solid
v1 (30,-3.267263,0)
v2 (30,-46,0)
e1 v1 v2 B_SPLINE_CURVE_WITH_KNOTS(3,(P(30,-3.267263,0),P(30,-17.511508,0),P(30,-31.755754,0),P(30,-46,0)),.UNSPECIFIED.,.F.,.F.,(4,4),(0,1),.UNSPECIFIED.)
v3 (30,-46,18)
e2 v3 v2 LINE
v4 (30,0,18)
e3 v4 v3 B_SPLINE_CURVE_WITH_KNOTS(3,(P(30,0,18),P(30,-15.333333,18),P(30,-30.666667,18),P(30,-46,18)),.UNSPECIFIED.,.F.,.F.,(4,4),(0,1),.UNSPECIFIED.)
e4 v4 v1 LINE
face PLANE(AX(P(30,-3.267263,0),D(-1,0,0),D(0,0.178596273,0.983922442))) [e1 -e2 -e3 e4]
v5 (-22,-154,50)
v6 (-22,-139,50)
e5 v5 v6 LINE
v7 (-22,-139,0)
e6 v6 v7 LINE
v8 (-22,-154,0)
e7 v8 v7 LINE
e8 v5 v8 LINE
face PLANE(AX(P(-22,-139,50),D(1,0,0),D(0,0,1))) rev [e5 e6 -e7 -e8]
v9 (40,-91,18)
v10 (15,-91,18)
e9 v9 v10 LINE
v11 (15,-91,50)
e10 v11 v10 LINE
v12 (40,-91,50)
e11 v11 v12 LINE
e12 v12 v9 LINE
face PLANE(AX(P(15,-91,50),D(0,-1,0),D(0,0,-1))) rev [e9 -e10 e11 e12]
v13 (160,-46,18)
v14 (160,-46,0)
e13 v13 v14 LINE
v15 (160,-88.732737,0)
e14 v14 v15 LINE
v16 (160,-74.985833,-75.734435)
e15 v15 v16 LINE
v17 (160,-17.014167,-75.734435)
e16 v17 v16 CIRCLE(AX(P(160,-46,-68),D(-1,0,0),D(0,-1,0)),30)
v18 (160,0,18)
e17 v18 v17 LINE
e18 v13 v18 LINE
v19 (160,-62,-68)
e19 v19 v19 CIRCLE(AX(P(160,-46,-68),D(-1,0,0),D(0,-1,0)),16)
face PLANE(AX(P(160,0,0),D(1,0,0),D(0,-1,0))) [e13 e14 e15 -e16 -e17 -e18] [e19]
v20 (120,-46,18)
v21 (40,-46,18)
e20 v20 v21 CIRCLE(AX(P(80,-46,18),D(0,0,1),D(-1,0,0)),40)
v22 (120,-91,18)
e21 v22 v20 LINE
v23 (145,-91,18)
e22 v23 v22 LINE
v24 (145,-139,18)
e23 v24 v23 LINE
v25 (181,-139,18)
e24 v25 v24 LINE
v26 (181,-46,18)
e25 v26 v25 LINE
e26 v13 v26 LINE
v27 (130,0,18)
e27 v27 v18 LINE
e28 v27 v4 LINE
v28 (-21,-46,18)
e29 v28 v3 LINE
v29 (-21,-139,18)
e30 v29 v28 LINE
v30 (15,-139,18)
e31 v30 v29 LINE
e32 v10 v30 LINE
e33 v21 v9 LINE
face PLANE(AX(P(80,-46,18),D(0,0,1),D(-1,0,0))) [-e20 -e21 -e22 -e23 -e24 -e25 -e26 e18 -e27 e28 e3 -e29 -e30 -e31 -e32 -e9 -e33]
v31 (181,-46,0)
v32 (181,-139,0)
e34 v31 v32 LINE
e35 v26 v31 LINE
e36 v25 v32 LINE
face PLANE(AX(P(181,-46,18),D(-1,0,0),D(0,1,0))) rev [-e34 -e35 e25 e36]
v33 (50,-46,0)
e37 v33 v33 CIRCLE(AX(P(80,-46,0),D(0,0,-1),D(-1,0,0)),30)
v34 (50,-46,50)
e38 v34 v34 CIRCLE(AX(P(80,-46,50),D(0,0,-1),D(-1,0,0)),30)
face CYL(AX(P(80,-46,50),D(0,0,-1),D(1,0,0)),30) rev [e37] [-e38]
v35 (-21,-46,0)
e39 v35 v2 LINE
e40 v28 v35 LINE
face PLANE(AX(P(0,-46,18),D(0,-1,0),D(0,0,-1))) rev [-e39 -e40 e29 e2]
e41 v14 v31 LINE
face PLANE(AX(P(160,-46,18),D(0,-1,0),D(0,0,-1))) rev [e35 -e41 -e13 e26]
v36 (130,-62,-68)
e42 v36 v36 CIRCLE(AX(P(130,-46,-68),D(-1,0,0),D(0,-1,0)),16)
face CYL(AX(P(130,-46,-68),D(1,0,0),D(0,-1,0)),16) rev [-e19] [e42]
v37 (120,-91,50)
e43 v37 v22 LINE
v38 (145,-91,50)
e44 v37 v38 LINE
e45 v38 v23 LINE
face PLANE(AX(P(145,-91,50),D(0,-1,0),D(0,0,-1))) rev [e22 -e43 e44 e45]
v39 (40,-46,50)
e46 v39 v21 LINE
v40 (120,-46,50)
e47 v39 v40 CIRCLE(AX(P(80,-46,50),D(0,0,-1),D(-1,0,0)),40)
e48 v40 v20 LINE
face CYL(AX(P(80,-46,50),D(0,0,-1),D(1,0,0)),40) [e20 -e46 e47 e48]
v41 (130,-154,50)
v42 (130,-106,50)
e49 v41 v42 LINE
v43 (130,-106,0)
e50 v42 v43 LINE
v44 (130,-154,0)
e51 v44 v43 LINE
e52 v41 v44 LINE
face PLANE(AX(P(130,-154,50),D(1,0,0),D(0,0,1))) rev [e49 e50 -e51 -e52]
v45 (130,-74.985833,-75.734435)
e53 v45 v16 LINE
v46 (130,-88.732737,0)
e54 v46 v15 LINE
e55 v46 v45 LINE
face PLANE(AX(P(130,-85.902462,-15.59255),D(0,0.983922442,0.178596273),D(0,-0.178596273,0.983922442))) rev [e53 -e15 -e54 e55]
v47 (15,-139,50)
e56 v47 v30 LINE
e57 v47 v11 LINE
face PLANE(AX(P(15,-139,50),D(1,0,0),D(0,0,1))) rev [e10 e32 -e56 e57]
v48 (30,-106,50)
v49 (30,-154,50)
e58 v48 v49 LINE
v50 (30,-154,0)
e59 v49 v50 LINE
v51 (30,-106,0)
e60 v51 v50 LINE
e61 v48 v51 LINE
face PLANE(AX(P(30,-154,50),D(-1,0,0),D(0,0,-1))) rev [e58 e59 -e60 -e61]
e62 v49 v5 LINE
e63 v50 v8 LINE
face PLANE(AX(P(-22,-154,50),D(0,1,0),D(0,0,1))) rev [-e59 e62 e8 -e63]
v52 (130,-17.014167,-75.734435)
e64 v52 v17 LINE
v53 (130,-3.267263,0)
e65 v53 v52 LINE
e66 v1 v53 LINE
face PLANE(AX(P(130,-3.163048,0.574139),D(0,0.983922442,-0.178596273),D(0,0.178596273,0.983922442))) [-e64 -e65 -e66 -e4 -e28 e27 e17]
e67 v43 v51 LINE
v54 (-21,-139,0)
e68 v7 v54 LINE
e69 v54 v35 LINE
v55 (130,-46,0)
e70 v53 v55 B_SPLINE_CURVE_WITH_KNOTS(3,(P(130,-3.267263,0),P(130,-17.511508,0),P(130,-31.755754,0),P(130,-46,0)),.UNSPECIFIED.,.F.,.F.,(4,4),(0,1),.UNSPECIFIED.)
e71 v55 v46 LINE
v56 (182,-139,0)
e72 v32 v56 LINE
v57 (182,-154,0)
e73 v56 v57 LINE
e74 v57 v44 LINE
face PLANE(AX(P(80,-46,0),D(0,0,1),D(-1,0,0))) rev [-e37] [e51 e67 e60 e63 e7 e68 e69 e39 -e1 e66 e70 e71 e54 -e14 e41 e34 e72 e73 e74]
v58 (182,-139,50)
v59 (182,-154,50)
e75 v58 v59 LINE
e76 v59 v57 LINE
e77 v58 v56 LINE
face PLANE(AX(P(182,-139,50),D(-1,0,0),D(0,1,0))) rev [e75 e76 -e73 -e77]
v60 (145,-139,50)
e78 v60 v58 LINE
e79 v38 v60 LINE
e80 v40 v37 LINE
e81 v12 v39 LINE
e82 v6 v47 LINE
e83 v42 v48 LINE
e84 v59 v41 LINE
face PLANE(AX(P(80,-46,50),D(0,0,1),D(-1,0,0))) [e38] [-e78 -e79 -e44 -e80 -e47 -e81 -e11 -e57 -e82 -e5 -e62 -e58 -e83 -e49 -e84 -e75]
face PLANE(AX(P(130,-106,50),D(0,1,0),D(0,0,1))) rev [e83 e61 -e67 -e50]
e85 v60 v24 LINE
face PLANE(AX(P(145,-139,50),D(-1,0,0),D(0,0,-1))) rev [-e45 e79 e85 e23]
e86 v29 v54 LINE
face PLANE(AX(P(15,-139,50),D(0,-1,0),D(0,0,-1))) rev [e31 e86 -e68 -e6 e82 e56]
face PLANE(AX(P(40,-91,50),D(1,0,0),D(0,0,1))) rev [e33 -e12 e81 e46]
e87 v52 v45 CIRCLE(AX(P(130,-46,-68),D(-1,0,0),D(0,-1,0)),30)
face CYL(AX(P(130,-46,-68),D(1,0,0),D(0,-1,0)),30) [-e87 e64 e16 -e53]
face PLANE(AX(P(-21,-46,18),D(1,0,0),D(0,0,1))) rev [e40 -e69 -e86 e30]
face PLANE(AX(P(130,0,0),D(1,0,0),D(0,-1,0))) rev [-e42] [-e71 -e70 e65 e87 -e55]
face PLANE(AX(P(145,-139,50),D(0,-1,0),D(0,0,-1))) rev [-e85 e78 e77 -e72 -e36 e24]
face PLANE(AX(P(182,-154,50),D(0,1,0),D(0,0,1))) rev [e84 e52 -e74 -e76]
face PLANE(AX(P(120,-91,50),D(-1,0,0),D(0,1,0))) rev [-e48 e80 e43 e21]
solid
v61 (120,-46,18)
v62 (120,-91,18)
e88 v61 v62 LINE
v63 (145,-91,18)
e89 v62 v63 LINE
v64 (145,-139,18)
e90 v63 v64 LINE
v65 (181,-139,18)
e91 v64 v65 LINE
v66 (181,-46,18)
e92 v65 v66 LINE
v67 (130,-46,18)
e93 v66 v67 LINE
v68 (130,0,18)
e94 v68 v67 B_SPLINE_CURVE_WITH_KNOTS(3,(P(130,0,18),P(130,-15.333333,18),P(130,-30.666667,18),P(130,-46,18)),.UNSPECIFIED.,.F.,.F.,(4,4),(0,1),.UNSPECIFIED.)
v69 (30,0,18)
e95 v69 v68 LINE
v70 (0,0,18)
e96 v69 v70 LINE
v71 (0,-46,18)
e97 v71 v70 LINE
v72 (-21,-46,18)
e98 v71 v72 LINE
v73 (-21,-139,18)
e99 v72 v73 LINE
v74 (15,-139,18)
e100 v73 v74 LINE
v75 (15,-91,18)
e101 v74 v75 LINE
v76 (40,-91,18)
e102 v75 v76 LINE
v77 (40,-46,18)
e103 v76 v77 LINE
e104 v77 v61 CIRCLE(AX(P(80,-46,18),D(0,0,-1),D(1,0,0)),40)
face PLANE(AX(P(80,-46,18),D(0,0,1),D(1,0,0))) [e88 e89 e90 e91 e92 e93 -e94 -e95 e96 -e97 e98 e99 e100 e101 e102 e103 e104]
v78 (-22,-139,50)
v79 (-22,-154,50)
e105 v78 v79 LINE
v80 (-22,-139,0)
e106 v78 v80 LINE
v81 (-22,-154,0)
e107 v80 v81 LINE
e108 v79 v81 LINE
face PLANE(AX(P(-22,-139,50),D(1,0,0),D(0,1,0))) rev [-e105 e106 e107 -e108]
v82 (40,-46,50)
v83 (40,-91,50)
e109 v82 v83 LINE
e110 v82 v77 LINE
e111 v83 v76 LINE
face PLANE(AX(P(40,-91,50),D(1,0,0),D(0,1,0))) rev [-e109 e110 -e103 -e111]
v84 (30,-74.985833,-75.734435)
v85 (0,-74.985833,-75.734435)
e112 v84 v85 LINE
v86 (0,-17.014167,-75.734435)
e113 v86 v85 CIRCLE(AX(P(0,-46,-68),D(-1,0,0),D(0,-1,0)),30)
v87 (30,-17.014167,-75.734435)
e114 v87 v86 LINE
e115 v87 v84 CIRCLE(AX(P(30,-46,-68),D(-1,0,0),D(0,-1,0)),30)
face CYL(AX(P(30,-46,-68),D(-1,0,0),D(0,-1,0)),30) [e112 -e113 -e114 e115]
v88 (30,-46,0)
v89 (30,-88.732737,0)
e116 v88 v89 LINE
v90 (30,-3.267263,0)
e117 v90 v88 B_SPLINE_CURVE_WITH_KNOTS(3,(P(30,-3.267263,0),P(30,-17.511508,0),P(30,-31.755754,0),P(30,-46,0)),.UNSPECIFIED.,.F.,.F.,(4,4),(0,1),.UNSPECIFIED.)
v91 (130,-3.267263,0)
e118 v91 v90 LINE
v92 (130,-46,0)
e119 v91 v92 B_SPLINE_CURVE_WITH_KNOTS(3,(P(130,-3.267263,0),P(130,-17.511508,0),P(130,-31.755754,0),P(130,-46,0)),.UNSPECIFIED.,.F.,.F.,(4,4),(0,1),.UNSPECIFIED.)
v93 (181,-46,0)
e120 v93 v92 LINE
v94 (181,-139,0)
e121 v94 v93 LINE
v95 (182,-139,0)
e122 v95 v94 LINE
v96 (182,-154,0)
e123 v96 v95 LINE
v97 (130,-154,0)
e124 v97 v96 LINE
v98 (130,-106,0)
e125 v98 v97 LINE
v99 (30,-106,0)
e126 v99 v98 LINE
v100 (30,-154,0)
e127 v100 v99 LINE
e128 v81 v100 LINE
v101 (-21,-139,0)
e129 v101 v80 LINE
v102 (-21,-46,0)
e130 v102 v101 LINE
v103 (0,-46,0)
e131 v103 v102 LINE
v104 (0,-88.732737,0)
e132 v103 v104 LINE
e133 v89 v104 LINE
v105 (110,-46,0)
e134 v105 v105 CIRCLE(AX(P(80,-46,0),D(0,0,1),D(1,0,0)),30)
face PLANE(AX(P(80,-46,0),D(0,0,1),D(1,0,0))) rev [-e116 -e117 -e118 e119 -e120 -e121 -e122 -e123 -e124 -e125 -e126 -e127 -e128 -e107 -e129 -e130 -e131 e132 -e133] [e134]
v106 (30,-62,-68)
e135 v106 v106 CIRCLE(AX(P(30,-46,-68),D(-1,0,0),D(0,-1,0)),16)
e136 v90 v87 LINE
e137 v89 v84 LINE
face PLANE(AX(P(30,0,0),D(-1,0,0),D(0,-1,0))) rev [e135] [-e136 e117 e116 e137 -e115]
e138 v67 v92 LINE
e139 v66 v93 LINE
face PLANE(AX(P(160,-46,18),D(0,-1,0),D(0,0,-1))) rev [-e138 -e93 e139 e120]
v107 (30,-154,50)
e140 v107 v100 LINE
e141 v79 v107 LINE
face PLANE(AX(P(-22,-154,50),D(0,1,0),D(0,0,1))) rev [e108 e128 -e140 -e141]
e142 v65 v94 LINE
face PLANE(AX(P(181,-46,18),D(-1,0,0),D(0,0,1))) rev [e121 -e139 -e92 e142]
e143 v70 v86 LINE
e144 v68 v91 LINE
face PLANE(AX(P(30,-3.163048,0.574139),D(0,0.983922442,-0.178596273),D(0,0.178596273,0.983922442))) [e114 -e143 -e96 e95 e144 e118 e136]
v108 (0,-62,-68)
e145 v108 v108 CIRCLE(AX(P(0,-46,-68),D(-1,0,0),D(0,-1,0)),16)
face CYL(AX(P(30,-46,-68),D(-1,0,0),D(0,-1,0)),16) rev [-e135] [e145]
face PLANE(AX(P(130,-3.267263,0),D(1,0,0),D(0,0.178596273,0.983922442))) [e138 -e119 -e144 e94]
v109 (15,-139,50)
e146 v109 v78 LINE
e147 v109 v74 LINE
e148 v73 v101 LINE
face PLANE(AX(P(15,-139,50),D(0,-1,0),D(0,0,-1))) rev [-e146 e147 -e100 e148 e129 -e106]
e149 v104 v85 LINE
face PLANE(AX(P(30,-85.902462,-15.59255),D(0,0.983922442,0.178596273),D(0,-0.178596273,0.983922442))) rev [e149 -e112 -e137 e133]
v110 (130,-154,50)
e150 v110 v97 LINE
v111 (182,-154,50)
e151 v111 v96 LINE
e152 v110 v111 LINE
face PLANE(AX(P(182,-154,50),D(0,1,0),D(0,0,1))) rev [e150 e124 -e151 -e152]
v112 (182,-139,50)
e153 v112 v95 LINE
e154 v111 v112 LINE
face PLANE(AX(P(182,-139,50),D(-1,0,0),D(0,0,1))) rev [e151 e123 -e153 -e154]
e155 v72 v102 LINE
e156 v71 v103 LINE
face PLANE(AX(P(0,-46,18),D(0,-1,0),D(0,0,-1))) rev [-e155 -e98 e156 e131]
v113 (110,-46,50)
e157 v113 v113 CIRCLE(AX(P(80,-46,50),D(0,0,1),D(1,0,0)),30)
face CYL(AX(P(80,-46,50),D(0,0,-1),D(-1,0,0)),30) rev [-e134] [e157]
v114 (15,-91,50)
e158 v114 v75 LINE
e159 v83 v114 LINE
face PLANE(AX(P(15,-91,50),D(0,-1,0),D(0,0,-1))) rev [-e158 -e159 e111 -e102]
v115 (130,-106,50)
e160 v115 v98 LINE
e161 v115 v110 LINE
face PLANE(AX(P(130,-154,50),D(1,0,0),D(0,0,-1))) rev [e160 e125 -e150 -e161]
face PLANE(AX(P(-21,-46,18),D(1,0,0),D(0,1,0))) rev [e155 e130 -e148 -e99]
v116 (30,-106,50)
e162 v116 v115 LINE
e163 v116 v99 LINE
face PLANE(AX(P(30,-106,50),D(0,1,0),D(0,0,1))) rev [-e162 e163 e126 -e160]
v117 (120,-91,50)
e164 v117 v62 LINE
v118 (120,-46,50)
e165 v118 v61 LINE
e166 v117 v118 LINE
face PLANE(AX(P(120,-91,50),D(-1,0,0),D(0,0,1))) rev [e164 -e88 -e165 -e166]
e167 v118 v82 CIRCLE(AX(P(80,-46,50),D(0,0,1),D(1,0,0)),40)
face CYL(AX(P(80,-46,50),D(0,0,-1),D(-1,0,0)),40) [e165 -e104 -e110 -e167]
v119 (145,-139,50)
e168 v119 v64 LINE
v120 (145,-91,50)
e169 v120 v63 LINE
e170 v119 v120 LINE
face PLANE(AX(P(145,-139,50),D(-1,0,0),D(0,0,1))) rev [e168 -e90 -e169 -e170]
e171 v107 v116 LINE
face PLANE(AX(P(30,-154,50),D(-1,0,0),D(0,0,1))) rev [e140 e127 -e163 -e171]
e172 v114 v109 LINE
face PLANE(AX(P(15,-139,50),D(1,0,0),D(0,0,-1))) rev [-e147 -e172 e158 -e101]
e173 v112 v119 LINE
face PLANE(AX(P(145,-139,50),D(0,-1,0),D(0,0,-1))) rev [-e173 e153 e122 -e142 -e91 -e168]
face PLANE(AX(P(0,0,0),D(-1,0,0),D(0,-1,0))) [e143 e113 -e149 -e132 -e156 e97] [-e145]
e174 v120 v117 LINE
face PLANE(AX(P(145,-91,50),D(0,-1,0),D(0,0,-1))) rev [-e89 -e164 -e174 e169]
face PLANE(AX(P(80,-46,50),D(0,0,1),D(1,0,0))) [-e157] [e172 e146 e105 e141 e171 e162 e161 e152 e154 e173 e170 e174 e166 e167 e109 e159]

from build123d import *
from build123d.topology import SkipClean

# Parameters (mm, degrees)
BOSS_EXTRUDE1_DEPTH      = 18
BOSS_EXTRUDE2_DEPTH      = 32
BOSS_EXTRUDE2_DEPTH_BACK = 18
SKETCH2_R                = 30
CUT_EXTRUDE2_DEPTH       = 244.598029549
CUT_EXTRUDE2_DEPTH_BACK  = 244.598029549
SKETCH6_W                = 18
SKETCH6_H                = 46
SKETCH4_R                = 16
BOSS_EXTRUDE3_DEPTH      = 30
LOFT1_START              = 30
LOFT1_DEPTH              = 100
BOSS_EXTRUDE4_DEPTH      = 30
SKETCH14_R               = 30
CUT_EXTRUDE3_DEPTH       = 252.475644944


# Read off the part's stored shape, not the designer's step: Loft1
with BuildPart() as part:
    # Sketch1 → Boss-Extrude1 (new body)
    with BuildSketch(Plane.XY):
        with BuildLine():
            Line((0, 0), (160, 0))
            Line((160, 0), (160, -46))
            Line((160, -46), (181, -46))
            Line((181, -46), (181, -139))
            Line((181, -139), (145, -139))
            Line((145, -139), (145, -91))
            Line((145, -91), (120, -91))
            Line((120, -91), (120, -46))
            ThreePointArc((120, -46), (80, -6), (40, -46))
            Line((40, -46), (40, -91))
            Line((40, -91), (15, -91))
            Line((15, -91), (15, -139))
            Line((15, -139), (-21, -139))
            Line((-21, -139), (-21, -46))
            Line((-21, -46), (0, -46))
            Line((0, -46), (0, 0))
        make_face()
    extrude(amount=BOSS_EXTRUDE1_DEPTH)

    # Sketch2 → Boss-Extrude2 (add, two sides: drawn at the far end of the back side and taken through both)
    with BuildSketch(Plane.XY.offset(18).offset(-BOSS_EXTRUDE2_DEPTH_BACK)):
        with BuildLine():
            Line((15, -139), (-22, -139))
            Line((-22, -139), (-22, -154))
            Line((-22, -154), (30, -154))
            Line((30, -154), (30, -106))
            Line((30, -106), (130, -106))
            Line((130, -106), (130, -154))
            Line((130, -154), (182, -154))
            Line((182, -154), (182, -139))
            Line((182, -139), (145, -139))
            Line((145, -139), (145, -91))
            Line((145, -91), (120, -91))
            Line((120, -91), (120, -46))
            ThreePointArc((120, -46), (80, -6), (40, -46))
            Line((40, -46), (40, -91))
            Line((40, -91), (15, -91))
            Line((15, -91), (15, -139))
        make_face()
        with Locations((80, -46)):
            Circle(SKETCH2_R, mode=Mode.SUBTRACT)
    extrude(amount=BOSS_EXTRUDE2_DEPTH + BOSS_EXTRUDE2_DEPTH_BACK)

    # Sketch6 → Cut-Extrude2 (cut, two sides: drawn at the far end of the back side and taken through both)
    with BuildSketch(Plane(origin=(160, 0, 0), x_dir=(0, 0, -1), z_dir=(1, 0, 0)).offset(-CUT_EXTRUDE2_DEPTH_BACK)):
        with Locations((-9, -23)):
            Rectangle(SKETCH6_W, SKETCH6_H)
    extrude(amount=CUT_EXTRUDE2_DEPTH + CUT_EXTRUDE2_DEPTH_BACK, mode=Mode.SUBTRACT)

    # Sketch4 → Boss-Extrude3 (add)
    # profile 1 of 2: a face of its own
    with BuildSketch(Plane.ZY):
        with BuildLine():
            Line((-70.946033736, -75.854997659), (18, -92))
            Line((18, -92), (18, -46))
            Line((18, -46), (0, -46))
            Line((0, -46), (0, -3.267262518))
            Line((0, -3.267262518), (-70.946033736, -16.145002341))
            Line((-70.946033736, -16.145002341), (-75.734435176, -17.014167038))
            ThreePointArc((-75.734435176, -17.014167038), (-98, -46), (-75.734435176, -74.985832962))
            Line((-75.734435176, -74.985832962), (-70.946033736, -75.854997659))
        make_face()
        with Locations(Location((-68, -46, 0), (0, 0, 270))):
            Circle(SKETCH4_R, mode=Mode.SUBTRACT)
    # profile 2 of 2: a face of its own
    with BuildSketch(Plane.ZY):
        Polygon((0, -46), (18, -46), (18, 0), (0, -3.267262518), align=None)
    extrude(amount=-BOSS_EXTRUDE3_DEPTH)

    # Loft1 outline → Loft1 (add)
    with BuildSketch(Plane.YZ.offset(LOFT1_START)):
        Polygon((-46, 0), (-3.267262518, 0), (0, 18), (-46, 18), align=None)
    extrude(amount=LOFT1_DEPTH)


with BuildPart() as body_2:
    # Sketch13 → Boss-Extrude4 (new body)
    with BuildSketch(Plane(origin=(0, 0, 0), x_dir=(-1, 0, 0), z_dir=(0, 0, -1))):
        with BuildLine():
            Line((-80, -46), (-80, -76))
            ThreePointArc((-80, -76), (-58.786796564, -67.213203436), (-50, -46))
            Line((-50, -46), (-80, -46))
        make_face()
    extrude(amount=BOSS_EXTRUDE4_DEPTH)


with BuildPart() as body_3:
    # Mirror6: mirrored copy
    add(part.part.mirror(Plane(origin=(80, -46, -30), x_dir=(0, 0, 1), z_dir=(-1, 0, 0))))


with BuildPart() as cut_extrude3_tool:
    # Sketch14 → Cut-Extrude3 (new, through all)
    with SkipClean():  # the faces are left unmerged after this step: merging them gives an invalid solid
        with BuildSketch(Plane(origin=(0, 0, -30), x_dir=(-1, 0, 0), z_dir=(0, 0, -1))):
            with Locations((-80, -46)):
                Circle(SKETCH14_R)
        extrude(amount=-CUT_EXTRUDE3_DEPTH)


with BuildPart() as part_1:
    with SkipClean():  # the faces are left unmerged after this step: merging them gives an invalid solid
        add(part.part)

        # Cut-Extrude3: cut by cut_extrude3_tool
        add(cut_extrude3_tool.part, mode=Mode.SUBTRACT)


with BuildPart() as body_2_1:
    with SkipClean():  # the faces are left unmerged after this step: merging them gives an invalid solid
        add(body_2.part)

        # Cut-Extrude3: cut by cut_extrude3_tool
        add(cut_extrude3_tool.part, mode=Mode.SUBTRACT)


with BuildPart() as body_3_1:
    with SkipClean():  # the faces are left unmerged after this step: merging them gives an invalid solid
        add(body_3.part)

        # Cut-Extrude3: cut by cut_extrude3_tool
        add(cut_extrude3_tool.part, mode=Mode.SUBTRACT)


solid = Compound([part_1.part, body_3_1.part])
